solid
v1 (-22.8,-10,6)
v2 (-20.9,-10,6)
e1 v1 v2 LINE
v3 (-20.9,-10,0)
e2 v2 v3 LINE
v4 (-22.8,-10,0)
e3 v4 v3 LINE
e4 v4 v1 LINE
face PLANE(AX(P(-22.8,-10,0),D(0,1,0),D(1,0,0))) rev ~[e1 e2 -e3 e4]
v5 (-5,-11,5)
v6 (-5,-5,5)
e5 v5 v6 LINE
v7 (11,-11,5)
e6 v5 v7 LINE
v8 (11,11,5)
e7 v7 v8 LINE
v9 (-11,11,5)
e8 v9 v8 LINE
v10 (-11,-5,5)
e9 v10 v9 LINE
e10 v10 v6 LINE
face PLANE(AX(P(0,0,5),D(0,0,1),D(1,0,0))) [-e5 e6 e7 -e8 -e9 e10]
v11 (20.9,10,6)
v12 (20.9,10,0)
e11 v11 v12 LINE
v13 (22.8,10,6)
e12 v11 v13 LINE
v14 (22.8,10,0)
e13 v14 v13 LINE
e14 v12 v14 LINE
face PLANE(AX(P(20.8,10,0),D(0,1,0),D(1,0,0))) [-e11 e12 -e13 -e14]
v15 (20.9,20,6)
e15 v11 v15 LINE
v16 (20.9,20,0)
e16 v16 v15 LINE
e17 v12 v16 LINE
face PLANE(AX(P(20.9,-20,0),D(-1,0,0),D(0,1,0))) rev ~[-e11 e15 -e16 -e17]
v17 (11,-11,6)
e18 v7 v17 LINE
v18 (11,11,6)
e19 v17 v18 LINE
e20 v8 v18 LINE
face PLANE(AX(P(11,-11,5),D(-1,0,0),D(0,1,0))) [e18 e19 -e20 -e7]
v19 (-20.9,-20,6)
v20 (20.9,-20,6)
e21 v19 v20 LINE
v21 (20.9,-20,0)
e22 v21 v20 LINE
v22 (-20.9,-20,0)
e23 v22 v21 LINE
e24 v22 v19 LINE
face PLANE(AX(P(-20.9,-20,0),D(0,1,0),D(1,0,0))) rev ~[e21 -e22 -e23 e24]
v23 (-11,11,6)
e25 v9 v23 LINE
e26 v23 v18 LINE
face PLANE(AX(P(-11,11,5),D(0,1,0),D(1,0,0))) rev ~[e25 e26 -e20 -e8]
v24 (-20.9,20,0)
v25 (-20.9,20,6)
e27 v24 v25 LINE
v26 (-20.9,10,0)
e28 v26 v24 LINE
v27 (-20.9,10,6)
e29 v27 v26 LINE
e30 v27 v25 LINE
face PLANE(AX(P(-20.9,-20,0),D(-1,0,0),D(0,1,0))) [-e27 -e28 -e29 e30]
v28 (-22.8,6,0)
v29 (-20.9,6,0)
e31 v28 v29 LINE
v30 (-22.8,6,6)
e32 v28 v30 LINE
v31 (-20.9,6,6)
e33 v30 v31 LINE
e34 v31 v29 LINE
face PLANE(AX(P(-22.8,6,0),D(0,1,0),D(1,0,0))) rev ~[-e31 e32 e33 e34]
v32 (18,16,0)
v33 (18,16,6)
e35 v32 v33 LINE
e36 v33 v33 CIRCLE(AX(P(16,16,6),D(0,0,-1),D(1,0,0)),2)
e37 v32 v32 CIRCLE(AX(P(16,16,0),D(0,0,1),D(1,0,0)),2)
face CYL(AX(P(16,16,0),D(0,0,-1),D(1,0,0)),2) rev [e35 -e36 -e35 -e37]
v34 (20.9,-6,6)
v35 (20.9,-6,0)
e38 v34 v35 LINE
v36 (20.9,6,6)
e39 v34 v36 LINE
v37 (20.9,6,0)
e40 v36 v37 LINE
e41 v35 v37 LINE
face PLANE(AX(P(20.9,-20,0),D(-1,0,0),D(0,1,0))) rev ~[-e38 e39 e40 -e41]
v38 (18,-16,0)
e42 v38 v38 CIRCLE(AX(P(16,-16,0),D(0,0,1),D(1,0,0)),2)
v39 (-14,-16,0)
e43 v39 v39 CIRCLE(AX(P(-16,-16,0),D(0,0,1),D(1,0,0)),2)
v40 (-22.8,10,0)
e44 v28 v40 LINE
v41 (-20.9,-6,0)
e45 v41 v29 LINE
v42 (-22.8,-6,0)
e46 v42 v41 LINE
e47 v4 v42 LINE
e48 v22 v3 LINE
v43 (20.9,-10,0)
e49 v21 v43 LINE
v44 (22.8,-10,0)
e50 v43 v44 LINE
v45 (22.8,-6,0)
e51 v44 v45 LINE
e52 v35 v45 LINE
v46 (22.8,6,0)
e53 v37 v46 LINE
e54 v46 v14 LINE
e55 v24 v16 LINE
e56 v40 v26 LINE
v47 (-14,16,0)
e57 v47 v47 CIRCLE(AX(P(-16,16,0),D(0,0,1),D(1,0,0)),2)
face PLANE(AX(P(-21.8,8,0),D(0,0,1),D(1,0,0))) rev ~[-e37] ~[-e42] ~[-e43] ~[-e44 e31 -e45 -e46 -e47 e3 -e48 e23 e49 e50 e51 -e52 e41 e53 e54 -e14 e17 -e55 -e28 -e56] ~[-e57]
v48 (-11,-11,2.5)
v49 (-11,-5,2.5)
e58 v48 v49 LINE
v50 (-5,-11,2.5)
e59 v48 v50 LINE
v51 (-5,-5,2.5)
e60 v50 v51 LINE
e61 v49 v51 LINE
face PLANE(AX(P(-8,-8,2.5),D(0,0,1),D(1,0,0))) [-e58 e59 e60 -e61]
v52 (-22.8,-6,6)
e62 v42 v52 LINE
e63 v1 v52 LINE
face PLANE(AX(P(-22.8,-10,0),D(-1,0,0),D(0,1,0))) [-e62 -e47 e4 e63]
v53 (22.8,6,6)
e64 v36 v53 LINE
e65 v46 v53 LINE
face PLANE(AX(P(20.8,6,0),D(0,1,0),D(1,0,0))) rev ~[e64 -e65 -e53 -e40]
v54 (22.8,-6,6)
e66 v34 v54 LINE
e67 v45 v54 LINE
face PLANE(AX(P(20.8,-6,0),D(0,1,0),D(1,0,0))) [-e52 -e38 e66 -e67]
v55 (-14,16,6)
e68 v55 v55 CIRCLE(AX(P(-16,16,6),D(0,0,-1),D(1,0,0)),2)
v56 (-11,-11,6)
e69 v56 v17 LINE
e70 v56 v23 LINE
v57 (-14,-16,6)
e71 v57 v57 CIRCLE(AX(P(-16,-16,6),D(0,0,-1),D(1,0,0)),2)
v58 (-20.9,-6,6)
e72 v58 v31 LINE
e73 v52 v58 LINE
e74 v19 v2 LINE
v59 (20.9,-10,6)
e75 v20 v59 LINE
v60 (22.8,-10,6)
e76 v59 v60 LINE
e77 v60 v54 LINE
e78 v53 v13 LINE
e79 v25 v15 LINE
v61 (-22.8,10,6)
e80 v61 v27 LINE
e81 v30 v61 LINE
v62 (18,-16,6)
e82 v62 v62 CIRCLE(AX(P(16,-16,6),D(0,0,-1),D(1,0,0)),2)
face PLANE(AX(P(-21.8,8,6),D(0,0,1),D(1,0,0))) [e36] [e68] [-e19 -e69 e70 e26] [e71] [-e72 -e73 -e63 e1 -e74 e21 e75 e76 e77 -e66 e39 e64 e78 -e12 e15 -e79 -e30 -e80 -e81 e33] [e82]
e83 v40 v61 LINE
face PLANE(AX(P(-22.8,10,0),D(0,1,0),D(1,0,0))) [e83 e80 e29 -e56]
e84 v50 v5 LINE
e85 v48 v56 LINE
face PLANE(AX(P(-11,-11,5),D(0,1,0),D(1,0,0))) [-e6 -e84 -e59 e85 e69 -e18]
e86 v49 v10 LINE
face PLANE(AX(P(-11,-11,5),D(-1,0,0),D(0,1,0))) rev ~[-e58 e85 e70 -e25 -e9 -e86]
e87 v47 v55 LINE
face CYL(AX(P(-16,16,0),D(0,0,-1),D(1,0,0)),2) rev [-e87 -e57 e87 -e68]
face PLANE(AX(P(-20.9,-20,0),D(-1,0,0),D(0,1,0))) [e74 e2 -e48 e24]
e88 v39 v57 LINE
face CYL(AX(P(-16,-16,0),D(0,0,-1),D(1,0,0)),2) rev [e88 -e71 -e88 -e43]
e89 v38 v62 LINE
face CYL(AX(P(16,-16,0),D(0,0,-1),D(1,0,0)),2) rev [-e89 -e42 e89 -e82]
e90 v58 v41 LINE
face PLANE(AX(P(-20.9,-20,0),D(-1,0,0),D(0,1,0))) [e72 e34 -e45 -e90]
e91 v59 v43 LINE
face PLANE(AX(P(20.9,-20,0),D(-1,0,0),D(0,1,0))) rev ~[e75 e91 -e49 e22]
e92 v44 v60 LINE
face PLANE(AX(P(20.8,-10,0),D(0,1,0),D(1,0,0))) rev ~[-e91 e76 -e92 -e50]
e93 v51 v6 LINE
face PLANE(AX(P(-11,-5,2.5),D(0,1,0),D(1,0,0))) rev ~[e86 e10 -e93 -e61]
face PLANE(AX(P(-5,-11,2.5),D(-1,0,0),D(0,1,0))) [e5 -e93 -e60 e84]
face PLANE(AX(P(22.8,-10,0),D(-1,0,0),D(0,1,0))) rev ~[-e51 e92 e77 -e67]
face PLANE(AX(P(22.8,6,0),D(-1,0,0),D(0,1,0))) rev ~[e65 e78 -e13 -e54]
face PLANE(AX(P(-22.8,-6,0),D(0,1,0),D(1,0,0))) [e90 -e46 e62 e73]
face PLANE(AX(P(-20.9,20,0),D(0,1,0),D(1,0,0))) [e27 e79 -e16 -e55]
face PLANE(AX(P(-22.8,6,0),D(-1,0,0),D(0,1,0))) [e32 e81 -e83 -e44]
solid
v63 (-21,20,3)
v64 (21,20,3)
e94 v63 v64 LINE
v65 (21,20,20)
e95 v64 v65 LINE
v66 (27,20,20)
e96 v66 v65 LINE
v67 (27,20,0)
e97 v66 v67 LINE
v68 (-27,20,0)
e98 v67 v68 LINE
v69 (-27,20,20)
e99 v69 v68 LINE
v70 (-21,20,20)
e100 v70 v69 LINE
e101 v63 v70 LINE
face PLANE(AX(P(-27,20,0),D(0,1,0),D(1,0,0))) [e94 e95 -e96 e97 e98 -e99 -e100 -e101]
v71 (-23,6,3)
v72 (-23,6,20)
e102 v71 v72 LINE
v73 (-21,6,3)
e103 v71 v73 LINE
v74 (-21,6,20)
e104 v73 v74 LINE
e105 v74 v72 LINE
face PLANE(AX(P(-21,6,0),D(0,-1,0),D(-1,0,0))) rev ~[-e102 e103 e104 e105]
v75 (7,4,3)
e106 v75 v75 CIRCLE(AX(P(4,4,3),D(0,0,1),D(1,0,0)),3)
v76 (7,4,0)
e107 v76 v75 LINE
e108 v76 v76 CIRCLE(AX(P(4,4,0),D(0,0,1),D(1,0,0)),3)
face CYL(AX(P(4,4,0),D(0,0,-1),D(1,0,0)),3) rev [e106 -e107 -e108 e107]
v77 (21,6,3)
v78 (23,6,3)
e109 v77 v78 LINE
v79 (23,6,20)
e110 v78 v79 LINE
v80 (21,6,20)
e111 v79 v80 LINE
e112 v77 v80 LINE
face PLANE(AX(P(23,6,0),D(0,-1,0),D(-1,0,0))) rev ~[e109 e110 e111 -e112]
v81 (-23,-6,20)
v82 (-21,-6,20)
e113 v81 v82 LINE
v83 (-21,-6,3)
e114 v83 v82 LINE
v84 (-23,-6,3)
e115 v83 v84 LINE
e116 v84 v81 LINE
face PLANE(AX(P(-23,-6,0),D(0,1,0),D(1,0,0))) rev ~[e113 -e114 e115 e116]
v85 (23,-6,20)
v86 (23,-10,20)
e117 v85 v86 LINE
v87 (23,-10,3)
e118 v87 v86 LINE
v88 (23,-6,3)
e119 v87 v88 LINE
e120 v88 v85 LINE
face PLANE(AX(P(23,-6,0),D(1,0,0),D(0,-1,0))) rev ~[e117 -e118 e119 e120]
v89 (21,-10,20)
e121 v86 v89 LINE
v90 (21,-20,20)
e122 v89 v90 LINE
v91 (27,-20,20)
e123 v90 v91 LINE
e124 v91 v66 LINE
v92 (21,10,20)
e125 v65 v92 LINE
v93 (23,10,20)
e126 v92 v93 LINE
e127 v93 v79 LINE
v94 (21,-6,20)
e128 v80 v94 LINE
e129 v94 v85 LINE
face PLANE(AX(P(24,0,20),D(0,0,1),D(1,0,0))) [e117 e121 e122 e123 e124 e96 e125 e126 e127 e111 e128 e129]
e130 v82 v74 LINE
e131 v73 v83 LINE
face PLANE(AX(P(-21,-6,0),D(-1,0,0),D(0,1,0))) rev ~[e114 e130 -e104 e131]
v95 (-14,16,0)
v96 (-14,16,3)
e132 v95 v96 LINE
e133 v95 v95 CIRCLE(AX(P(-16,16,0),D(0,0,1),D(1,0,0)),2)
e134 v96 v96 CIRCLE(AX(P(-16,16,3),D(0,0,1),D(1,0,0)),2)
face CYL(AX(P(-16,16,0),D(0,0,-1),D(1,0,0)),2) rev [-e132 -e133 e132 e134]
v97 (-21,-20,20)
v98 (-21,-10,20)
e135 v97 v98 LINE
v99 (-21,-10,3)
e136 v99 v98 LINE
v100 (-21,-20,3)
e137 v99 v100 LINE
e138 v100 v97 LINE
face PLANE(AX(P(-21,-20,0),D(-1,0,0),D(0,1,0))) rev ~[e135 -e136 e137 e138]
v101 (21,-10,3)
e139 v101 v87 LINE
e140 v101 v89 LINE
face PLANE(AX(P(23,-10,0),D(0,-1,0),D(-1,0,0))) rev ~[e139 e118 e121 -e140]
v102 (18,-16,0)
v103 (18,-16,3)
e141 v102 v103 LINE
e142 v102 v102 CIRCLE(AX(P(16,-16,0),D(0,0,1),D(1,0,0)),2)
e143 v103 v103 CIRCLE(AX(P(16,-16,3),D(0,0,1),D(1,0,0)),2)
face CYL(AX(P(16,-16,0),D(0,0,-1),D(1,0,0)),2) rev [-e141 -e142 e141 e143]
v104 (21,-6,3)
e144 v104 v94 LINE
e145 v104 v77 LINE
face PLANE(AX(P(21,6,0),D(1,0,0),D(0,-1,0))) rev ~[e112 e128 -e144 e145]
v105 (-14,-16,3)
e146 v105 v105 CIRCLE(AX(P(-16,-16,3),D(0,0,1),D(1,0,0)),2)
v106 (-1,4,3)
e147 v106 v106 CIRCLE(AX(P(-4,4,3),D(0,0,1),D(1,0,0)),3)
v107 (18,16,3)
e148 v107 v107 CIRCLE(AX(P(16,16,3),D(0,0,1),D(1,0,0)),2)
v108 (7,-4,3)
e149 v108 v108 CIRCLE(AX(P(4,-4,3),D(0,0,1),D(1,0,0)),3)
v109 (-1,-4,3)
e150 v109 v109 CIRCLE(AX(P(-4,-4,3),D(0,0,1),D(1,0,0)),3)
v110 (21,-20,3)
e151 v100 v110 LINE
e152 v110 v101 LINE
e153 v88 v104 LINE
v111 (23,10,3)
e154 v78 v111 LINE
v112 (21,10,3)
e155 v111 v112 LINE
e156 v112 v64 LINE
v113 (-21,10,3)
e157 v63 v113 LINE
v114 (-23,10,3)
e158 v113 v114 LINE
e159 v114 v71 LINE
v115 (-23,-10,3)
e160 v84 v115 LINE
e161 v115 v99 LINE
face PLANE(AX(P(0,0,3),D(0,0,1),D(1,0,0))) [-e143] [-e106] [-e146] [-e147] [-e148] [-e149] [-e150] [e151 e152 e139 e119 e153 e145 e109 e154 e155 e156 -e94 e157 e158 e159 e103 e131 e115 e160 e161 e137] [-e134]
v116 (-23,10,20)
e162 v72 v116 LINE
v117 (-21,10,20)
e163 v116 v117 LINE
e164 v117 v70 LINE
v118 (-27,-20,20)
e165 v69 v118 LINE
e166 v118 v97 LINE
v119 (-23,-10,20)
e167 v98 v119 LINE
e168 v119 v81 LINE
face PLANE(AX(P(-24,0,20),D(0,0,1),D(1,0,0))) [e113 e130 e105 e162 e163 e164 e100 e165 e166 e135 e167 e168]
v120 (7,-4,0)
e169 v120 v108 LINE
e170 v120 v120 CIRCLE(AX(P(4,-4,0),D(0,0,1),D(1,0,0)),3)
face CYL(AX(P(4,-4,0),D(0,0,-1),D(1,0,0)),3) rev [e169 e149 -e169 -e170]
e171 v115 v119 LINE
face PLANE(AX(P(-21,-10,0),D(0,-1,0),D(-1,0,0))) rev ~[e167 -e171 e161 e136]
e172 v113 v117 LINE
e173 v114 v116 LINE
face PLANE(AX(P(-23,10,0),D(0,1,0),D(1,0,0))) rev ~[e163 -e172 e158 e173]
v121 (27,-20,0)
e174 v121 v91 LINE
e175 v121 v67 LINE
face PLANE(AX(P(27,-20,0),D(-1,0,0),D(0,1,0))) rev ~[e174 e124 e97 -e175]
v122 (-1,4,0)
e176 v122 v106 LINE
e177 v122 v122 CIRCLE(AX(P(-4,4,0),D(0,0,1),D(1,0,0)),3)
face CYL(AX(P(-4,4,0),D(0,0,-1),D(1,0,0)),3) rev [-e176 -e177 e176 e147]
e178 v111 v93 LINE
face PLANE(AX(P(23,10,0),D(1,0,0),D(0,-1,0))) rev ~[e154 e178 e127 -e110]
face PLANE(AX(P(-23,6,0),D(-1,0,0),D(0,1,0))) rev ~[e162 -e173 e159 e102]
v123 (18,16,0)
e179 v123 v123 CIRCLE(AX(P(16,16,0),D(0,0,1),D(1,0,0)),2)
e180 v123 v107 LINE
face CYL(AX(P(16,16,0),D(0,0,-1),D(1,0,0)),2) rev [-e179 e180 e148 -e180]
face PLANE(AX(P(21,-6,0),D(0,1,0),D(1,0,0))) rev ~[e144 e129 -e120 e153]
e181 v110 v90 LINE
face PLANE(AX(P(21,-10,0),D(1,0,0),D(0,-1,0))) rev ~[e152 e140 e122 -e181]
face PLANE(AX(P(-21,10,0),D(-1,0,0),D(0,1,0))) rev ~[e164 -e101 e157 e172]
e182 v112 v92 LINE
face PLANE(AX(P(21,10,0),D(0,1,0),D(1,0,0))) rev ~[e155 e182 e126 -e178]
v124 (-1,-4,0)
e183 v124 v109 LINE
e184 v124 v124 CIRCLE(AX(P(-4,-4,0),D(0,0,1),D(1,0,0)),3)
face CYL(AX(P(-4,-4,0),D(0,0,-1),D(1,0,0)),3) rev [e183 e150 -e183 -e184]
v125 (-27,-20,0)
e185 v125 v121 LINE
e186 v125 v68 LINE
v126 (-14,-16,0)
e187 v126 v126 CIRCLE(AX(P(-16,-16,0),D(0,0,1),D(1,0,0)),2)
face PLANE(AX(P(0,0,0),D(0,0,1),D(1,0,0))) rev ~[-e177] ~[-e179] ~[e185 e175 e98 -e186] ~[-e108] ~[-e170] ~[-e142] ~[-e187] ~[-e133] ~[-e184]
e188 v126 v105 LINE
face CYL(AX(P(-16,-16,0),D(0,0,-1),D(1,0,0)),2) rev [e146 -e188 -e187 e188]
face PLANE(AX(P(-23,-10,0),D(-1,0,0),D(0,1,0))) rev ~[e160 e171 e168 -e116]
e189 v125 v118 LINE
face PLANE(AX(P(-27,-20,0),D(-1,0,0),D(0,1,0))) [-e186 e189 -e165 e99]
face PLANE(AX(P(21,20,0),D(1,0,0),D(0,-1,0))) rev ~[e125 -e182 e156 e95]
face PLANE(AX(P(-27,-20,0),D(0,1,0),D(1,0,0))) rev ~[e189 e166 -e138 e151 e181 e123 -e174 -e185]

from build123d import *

# Parameters (mm, degrees)
F0_W      = 54
F0_H      = 40
F0_R      = 2
F0_R_2    = 3
F1_DEPTH  = 3
F3_DEPTH  = 20
F4_W      = 41.8
F4_H      = 40
F5_DEPTH  = 6
F7_START  = 5
F6_W      = 22
F6_H      = 22
F7_DEPTH  = 1
F9_START  = 2.5
F8_W      = 6
F8_H      = 6
F9_DEPTH  = 2.5
F12_R     = 2
F13_DEPTH = 25
F14_W     = 2
F14_H     = 4
F15_DEPTH = 6


# Not quite as in the source:
# - a feature of the source that left no trace in its solid (it failed there, or was rolled back) is left out


with BuildPart() as f1:
    # F0 (on Top) → F1 (new body)
    with BuildSketch(Plane.XY):
        Rectangle(F0_W, F0_H)
        with Locations((-16, -16)):
            Circle(F0_R, mode=Mode.SUBTRACT)
        with Locations((-4, -4)):
            Circle(F0_R_2, mode=Mode.SUBTRACT)
        with Locations((16, -16)):
            Circle(F0_R, mode=Mode.SUBTRACT)
        with Locations((4, -4)):
            Circle(F0_R_2, mode=Mode.SUBTRACT)
        with Locations((-4, 4)):
            Circle(F0_R_2, mode=Mode.SUBTRACT)
        with Locations((-16, 16)):
            Circle(F0_R, mode=Mode.SUBTRACT)
        with Locations((4, 4)):
            Circle(F0_R_2, mode=Mode.SUBTRACT)
        with Locations((16, 16)):
            Circle(F0_R, mode=Mode.SUBTRACT)
    extrude(amount=F1_DEPTH)

    # F2 (on Top) → F3 (join)
    with BuildSketch(Plane.XY):
        Polygon((-27, 12.5), (-27, -20), (-21, -20), (-21, -10), (-23, -10), (-23, -6), (-21, -6), (-21, 6), (-23, 6), (-23, 10), (-21, 10), (-21, 20), (-27, 20), align=None)
        Polygon((27, 20), (21, 20), (21, 10), (23, 10), (23, 6), (21, 6), (21, -6), (23, -6), (23, -10), (21, -10), (21, -20), (27, -20), align=None)
    extrude(amount=F3_DEPTH)


with BuildPart() as f5:
    # F4 (on Top) → F5 (new body)
    with BuildSketch(Plane.XY):
        Rectangle(F4_W, F4_H)
    extrude(amount=F5_DEPTH)

    # F6 (on Top) → F7 (cut)
    with BuildSketch(Plane.XY.offset(F7_START)):
        Rectangle(F6_W, F6_H)
    extrude(amount=F7_DEPTH, mode=Mode.SUBTRACT)

    # F8 (on Top) → F9 (cut)
    with BuildSketch(Plane.XY.offset(F9_START)):
        with Locations((-8, -8)):
            Rectangle(F8_W, F8_H)
    extrude(amount=F9_DEPTH, mode=Mode.SUBTRACT)

    # F12 (on Top) → F13 (cut)
    with BuildSketch(Plane.XY):
        with Locations((-16, 16)):
            Circle(F12_R)
        with Locations((16, 16)):
            Circle(F12_R)
        with Locations((16, -16)):
            Circle(F12_R)
        with Locations((-16, -16)):
            Circle(F12_R)
    extrude(amount=F13_DEPTH, mode=Mode.SUBTRACT)

    # F14 (on Top) → F15 (join)
    with BuildSketch(Plane.XY):
        with Locations((-21.8, 8)):
            Rectangle(F14_W, F14_H)
        with Locations((-21.8, -8)):
            Rectangle(F14_W, F14_H)
        with Locations((21.8, 8)):
            Rectangle(F14_W, F14_H)
        with Locations((21.8, -8)):
            Rectangle(F14_W, F14_H)
    extrude(amount=F15_DEPTH)


solid = Compound([f1.part, f5.part])
